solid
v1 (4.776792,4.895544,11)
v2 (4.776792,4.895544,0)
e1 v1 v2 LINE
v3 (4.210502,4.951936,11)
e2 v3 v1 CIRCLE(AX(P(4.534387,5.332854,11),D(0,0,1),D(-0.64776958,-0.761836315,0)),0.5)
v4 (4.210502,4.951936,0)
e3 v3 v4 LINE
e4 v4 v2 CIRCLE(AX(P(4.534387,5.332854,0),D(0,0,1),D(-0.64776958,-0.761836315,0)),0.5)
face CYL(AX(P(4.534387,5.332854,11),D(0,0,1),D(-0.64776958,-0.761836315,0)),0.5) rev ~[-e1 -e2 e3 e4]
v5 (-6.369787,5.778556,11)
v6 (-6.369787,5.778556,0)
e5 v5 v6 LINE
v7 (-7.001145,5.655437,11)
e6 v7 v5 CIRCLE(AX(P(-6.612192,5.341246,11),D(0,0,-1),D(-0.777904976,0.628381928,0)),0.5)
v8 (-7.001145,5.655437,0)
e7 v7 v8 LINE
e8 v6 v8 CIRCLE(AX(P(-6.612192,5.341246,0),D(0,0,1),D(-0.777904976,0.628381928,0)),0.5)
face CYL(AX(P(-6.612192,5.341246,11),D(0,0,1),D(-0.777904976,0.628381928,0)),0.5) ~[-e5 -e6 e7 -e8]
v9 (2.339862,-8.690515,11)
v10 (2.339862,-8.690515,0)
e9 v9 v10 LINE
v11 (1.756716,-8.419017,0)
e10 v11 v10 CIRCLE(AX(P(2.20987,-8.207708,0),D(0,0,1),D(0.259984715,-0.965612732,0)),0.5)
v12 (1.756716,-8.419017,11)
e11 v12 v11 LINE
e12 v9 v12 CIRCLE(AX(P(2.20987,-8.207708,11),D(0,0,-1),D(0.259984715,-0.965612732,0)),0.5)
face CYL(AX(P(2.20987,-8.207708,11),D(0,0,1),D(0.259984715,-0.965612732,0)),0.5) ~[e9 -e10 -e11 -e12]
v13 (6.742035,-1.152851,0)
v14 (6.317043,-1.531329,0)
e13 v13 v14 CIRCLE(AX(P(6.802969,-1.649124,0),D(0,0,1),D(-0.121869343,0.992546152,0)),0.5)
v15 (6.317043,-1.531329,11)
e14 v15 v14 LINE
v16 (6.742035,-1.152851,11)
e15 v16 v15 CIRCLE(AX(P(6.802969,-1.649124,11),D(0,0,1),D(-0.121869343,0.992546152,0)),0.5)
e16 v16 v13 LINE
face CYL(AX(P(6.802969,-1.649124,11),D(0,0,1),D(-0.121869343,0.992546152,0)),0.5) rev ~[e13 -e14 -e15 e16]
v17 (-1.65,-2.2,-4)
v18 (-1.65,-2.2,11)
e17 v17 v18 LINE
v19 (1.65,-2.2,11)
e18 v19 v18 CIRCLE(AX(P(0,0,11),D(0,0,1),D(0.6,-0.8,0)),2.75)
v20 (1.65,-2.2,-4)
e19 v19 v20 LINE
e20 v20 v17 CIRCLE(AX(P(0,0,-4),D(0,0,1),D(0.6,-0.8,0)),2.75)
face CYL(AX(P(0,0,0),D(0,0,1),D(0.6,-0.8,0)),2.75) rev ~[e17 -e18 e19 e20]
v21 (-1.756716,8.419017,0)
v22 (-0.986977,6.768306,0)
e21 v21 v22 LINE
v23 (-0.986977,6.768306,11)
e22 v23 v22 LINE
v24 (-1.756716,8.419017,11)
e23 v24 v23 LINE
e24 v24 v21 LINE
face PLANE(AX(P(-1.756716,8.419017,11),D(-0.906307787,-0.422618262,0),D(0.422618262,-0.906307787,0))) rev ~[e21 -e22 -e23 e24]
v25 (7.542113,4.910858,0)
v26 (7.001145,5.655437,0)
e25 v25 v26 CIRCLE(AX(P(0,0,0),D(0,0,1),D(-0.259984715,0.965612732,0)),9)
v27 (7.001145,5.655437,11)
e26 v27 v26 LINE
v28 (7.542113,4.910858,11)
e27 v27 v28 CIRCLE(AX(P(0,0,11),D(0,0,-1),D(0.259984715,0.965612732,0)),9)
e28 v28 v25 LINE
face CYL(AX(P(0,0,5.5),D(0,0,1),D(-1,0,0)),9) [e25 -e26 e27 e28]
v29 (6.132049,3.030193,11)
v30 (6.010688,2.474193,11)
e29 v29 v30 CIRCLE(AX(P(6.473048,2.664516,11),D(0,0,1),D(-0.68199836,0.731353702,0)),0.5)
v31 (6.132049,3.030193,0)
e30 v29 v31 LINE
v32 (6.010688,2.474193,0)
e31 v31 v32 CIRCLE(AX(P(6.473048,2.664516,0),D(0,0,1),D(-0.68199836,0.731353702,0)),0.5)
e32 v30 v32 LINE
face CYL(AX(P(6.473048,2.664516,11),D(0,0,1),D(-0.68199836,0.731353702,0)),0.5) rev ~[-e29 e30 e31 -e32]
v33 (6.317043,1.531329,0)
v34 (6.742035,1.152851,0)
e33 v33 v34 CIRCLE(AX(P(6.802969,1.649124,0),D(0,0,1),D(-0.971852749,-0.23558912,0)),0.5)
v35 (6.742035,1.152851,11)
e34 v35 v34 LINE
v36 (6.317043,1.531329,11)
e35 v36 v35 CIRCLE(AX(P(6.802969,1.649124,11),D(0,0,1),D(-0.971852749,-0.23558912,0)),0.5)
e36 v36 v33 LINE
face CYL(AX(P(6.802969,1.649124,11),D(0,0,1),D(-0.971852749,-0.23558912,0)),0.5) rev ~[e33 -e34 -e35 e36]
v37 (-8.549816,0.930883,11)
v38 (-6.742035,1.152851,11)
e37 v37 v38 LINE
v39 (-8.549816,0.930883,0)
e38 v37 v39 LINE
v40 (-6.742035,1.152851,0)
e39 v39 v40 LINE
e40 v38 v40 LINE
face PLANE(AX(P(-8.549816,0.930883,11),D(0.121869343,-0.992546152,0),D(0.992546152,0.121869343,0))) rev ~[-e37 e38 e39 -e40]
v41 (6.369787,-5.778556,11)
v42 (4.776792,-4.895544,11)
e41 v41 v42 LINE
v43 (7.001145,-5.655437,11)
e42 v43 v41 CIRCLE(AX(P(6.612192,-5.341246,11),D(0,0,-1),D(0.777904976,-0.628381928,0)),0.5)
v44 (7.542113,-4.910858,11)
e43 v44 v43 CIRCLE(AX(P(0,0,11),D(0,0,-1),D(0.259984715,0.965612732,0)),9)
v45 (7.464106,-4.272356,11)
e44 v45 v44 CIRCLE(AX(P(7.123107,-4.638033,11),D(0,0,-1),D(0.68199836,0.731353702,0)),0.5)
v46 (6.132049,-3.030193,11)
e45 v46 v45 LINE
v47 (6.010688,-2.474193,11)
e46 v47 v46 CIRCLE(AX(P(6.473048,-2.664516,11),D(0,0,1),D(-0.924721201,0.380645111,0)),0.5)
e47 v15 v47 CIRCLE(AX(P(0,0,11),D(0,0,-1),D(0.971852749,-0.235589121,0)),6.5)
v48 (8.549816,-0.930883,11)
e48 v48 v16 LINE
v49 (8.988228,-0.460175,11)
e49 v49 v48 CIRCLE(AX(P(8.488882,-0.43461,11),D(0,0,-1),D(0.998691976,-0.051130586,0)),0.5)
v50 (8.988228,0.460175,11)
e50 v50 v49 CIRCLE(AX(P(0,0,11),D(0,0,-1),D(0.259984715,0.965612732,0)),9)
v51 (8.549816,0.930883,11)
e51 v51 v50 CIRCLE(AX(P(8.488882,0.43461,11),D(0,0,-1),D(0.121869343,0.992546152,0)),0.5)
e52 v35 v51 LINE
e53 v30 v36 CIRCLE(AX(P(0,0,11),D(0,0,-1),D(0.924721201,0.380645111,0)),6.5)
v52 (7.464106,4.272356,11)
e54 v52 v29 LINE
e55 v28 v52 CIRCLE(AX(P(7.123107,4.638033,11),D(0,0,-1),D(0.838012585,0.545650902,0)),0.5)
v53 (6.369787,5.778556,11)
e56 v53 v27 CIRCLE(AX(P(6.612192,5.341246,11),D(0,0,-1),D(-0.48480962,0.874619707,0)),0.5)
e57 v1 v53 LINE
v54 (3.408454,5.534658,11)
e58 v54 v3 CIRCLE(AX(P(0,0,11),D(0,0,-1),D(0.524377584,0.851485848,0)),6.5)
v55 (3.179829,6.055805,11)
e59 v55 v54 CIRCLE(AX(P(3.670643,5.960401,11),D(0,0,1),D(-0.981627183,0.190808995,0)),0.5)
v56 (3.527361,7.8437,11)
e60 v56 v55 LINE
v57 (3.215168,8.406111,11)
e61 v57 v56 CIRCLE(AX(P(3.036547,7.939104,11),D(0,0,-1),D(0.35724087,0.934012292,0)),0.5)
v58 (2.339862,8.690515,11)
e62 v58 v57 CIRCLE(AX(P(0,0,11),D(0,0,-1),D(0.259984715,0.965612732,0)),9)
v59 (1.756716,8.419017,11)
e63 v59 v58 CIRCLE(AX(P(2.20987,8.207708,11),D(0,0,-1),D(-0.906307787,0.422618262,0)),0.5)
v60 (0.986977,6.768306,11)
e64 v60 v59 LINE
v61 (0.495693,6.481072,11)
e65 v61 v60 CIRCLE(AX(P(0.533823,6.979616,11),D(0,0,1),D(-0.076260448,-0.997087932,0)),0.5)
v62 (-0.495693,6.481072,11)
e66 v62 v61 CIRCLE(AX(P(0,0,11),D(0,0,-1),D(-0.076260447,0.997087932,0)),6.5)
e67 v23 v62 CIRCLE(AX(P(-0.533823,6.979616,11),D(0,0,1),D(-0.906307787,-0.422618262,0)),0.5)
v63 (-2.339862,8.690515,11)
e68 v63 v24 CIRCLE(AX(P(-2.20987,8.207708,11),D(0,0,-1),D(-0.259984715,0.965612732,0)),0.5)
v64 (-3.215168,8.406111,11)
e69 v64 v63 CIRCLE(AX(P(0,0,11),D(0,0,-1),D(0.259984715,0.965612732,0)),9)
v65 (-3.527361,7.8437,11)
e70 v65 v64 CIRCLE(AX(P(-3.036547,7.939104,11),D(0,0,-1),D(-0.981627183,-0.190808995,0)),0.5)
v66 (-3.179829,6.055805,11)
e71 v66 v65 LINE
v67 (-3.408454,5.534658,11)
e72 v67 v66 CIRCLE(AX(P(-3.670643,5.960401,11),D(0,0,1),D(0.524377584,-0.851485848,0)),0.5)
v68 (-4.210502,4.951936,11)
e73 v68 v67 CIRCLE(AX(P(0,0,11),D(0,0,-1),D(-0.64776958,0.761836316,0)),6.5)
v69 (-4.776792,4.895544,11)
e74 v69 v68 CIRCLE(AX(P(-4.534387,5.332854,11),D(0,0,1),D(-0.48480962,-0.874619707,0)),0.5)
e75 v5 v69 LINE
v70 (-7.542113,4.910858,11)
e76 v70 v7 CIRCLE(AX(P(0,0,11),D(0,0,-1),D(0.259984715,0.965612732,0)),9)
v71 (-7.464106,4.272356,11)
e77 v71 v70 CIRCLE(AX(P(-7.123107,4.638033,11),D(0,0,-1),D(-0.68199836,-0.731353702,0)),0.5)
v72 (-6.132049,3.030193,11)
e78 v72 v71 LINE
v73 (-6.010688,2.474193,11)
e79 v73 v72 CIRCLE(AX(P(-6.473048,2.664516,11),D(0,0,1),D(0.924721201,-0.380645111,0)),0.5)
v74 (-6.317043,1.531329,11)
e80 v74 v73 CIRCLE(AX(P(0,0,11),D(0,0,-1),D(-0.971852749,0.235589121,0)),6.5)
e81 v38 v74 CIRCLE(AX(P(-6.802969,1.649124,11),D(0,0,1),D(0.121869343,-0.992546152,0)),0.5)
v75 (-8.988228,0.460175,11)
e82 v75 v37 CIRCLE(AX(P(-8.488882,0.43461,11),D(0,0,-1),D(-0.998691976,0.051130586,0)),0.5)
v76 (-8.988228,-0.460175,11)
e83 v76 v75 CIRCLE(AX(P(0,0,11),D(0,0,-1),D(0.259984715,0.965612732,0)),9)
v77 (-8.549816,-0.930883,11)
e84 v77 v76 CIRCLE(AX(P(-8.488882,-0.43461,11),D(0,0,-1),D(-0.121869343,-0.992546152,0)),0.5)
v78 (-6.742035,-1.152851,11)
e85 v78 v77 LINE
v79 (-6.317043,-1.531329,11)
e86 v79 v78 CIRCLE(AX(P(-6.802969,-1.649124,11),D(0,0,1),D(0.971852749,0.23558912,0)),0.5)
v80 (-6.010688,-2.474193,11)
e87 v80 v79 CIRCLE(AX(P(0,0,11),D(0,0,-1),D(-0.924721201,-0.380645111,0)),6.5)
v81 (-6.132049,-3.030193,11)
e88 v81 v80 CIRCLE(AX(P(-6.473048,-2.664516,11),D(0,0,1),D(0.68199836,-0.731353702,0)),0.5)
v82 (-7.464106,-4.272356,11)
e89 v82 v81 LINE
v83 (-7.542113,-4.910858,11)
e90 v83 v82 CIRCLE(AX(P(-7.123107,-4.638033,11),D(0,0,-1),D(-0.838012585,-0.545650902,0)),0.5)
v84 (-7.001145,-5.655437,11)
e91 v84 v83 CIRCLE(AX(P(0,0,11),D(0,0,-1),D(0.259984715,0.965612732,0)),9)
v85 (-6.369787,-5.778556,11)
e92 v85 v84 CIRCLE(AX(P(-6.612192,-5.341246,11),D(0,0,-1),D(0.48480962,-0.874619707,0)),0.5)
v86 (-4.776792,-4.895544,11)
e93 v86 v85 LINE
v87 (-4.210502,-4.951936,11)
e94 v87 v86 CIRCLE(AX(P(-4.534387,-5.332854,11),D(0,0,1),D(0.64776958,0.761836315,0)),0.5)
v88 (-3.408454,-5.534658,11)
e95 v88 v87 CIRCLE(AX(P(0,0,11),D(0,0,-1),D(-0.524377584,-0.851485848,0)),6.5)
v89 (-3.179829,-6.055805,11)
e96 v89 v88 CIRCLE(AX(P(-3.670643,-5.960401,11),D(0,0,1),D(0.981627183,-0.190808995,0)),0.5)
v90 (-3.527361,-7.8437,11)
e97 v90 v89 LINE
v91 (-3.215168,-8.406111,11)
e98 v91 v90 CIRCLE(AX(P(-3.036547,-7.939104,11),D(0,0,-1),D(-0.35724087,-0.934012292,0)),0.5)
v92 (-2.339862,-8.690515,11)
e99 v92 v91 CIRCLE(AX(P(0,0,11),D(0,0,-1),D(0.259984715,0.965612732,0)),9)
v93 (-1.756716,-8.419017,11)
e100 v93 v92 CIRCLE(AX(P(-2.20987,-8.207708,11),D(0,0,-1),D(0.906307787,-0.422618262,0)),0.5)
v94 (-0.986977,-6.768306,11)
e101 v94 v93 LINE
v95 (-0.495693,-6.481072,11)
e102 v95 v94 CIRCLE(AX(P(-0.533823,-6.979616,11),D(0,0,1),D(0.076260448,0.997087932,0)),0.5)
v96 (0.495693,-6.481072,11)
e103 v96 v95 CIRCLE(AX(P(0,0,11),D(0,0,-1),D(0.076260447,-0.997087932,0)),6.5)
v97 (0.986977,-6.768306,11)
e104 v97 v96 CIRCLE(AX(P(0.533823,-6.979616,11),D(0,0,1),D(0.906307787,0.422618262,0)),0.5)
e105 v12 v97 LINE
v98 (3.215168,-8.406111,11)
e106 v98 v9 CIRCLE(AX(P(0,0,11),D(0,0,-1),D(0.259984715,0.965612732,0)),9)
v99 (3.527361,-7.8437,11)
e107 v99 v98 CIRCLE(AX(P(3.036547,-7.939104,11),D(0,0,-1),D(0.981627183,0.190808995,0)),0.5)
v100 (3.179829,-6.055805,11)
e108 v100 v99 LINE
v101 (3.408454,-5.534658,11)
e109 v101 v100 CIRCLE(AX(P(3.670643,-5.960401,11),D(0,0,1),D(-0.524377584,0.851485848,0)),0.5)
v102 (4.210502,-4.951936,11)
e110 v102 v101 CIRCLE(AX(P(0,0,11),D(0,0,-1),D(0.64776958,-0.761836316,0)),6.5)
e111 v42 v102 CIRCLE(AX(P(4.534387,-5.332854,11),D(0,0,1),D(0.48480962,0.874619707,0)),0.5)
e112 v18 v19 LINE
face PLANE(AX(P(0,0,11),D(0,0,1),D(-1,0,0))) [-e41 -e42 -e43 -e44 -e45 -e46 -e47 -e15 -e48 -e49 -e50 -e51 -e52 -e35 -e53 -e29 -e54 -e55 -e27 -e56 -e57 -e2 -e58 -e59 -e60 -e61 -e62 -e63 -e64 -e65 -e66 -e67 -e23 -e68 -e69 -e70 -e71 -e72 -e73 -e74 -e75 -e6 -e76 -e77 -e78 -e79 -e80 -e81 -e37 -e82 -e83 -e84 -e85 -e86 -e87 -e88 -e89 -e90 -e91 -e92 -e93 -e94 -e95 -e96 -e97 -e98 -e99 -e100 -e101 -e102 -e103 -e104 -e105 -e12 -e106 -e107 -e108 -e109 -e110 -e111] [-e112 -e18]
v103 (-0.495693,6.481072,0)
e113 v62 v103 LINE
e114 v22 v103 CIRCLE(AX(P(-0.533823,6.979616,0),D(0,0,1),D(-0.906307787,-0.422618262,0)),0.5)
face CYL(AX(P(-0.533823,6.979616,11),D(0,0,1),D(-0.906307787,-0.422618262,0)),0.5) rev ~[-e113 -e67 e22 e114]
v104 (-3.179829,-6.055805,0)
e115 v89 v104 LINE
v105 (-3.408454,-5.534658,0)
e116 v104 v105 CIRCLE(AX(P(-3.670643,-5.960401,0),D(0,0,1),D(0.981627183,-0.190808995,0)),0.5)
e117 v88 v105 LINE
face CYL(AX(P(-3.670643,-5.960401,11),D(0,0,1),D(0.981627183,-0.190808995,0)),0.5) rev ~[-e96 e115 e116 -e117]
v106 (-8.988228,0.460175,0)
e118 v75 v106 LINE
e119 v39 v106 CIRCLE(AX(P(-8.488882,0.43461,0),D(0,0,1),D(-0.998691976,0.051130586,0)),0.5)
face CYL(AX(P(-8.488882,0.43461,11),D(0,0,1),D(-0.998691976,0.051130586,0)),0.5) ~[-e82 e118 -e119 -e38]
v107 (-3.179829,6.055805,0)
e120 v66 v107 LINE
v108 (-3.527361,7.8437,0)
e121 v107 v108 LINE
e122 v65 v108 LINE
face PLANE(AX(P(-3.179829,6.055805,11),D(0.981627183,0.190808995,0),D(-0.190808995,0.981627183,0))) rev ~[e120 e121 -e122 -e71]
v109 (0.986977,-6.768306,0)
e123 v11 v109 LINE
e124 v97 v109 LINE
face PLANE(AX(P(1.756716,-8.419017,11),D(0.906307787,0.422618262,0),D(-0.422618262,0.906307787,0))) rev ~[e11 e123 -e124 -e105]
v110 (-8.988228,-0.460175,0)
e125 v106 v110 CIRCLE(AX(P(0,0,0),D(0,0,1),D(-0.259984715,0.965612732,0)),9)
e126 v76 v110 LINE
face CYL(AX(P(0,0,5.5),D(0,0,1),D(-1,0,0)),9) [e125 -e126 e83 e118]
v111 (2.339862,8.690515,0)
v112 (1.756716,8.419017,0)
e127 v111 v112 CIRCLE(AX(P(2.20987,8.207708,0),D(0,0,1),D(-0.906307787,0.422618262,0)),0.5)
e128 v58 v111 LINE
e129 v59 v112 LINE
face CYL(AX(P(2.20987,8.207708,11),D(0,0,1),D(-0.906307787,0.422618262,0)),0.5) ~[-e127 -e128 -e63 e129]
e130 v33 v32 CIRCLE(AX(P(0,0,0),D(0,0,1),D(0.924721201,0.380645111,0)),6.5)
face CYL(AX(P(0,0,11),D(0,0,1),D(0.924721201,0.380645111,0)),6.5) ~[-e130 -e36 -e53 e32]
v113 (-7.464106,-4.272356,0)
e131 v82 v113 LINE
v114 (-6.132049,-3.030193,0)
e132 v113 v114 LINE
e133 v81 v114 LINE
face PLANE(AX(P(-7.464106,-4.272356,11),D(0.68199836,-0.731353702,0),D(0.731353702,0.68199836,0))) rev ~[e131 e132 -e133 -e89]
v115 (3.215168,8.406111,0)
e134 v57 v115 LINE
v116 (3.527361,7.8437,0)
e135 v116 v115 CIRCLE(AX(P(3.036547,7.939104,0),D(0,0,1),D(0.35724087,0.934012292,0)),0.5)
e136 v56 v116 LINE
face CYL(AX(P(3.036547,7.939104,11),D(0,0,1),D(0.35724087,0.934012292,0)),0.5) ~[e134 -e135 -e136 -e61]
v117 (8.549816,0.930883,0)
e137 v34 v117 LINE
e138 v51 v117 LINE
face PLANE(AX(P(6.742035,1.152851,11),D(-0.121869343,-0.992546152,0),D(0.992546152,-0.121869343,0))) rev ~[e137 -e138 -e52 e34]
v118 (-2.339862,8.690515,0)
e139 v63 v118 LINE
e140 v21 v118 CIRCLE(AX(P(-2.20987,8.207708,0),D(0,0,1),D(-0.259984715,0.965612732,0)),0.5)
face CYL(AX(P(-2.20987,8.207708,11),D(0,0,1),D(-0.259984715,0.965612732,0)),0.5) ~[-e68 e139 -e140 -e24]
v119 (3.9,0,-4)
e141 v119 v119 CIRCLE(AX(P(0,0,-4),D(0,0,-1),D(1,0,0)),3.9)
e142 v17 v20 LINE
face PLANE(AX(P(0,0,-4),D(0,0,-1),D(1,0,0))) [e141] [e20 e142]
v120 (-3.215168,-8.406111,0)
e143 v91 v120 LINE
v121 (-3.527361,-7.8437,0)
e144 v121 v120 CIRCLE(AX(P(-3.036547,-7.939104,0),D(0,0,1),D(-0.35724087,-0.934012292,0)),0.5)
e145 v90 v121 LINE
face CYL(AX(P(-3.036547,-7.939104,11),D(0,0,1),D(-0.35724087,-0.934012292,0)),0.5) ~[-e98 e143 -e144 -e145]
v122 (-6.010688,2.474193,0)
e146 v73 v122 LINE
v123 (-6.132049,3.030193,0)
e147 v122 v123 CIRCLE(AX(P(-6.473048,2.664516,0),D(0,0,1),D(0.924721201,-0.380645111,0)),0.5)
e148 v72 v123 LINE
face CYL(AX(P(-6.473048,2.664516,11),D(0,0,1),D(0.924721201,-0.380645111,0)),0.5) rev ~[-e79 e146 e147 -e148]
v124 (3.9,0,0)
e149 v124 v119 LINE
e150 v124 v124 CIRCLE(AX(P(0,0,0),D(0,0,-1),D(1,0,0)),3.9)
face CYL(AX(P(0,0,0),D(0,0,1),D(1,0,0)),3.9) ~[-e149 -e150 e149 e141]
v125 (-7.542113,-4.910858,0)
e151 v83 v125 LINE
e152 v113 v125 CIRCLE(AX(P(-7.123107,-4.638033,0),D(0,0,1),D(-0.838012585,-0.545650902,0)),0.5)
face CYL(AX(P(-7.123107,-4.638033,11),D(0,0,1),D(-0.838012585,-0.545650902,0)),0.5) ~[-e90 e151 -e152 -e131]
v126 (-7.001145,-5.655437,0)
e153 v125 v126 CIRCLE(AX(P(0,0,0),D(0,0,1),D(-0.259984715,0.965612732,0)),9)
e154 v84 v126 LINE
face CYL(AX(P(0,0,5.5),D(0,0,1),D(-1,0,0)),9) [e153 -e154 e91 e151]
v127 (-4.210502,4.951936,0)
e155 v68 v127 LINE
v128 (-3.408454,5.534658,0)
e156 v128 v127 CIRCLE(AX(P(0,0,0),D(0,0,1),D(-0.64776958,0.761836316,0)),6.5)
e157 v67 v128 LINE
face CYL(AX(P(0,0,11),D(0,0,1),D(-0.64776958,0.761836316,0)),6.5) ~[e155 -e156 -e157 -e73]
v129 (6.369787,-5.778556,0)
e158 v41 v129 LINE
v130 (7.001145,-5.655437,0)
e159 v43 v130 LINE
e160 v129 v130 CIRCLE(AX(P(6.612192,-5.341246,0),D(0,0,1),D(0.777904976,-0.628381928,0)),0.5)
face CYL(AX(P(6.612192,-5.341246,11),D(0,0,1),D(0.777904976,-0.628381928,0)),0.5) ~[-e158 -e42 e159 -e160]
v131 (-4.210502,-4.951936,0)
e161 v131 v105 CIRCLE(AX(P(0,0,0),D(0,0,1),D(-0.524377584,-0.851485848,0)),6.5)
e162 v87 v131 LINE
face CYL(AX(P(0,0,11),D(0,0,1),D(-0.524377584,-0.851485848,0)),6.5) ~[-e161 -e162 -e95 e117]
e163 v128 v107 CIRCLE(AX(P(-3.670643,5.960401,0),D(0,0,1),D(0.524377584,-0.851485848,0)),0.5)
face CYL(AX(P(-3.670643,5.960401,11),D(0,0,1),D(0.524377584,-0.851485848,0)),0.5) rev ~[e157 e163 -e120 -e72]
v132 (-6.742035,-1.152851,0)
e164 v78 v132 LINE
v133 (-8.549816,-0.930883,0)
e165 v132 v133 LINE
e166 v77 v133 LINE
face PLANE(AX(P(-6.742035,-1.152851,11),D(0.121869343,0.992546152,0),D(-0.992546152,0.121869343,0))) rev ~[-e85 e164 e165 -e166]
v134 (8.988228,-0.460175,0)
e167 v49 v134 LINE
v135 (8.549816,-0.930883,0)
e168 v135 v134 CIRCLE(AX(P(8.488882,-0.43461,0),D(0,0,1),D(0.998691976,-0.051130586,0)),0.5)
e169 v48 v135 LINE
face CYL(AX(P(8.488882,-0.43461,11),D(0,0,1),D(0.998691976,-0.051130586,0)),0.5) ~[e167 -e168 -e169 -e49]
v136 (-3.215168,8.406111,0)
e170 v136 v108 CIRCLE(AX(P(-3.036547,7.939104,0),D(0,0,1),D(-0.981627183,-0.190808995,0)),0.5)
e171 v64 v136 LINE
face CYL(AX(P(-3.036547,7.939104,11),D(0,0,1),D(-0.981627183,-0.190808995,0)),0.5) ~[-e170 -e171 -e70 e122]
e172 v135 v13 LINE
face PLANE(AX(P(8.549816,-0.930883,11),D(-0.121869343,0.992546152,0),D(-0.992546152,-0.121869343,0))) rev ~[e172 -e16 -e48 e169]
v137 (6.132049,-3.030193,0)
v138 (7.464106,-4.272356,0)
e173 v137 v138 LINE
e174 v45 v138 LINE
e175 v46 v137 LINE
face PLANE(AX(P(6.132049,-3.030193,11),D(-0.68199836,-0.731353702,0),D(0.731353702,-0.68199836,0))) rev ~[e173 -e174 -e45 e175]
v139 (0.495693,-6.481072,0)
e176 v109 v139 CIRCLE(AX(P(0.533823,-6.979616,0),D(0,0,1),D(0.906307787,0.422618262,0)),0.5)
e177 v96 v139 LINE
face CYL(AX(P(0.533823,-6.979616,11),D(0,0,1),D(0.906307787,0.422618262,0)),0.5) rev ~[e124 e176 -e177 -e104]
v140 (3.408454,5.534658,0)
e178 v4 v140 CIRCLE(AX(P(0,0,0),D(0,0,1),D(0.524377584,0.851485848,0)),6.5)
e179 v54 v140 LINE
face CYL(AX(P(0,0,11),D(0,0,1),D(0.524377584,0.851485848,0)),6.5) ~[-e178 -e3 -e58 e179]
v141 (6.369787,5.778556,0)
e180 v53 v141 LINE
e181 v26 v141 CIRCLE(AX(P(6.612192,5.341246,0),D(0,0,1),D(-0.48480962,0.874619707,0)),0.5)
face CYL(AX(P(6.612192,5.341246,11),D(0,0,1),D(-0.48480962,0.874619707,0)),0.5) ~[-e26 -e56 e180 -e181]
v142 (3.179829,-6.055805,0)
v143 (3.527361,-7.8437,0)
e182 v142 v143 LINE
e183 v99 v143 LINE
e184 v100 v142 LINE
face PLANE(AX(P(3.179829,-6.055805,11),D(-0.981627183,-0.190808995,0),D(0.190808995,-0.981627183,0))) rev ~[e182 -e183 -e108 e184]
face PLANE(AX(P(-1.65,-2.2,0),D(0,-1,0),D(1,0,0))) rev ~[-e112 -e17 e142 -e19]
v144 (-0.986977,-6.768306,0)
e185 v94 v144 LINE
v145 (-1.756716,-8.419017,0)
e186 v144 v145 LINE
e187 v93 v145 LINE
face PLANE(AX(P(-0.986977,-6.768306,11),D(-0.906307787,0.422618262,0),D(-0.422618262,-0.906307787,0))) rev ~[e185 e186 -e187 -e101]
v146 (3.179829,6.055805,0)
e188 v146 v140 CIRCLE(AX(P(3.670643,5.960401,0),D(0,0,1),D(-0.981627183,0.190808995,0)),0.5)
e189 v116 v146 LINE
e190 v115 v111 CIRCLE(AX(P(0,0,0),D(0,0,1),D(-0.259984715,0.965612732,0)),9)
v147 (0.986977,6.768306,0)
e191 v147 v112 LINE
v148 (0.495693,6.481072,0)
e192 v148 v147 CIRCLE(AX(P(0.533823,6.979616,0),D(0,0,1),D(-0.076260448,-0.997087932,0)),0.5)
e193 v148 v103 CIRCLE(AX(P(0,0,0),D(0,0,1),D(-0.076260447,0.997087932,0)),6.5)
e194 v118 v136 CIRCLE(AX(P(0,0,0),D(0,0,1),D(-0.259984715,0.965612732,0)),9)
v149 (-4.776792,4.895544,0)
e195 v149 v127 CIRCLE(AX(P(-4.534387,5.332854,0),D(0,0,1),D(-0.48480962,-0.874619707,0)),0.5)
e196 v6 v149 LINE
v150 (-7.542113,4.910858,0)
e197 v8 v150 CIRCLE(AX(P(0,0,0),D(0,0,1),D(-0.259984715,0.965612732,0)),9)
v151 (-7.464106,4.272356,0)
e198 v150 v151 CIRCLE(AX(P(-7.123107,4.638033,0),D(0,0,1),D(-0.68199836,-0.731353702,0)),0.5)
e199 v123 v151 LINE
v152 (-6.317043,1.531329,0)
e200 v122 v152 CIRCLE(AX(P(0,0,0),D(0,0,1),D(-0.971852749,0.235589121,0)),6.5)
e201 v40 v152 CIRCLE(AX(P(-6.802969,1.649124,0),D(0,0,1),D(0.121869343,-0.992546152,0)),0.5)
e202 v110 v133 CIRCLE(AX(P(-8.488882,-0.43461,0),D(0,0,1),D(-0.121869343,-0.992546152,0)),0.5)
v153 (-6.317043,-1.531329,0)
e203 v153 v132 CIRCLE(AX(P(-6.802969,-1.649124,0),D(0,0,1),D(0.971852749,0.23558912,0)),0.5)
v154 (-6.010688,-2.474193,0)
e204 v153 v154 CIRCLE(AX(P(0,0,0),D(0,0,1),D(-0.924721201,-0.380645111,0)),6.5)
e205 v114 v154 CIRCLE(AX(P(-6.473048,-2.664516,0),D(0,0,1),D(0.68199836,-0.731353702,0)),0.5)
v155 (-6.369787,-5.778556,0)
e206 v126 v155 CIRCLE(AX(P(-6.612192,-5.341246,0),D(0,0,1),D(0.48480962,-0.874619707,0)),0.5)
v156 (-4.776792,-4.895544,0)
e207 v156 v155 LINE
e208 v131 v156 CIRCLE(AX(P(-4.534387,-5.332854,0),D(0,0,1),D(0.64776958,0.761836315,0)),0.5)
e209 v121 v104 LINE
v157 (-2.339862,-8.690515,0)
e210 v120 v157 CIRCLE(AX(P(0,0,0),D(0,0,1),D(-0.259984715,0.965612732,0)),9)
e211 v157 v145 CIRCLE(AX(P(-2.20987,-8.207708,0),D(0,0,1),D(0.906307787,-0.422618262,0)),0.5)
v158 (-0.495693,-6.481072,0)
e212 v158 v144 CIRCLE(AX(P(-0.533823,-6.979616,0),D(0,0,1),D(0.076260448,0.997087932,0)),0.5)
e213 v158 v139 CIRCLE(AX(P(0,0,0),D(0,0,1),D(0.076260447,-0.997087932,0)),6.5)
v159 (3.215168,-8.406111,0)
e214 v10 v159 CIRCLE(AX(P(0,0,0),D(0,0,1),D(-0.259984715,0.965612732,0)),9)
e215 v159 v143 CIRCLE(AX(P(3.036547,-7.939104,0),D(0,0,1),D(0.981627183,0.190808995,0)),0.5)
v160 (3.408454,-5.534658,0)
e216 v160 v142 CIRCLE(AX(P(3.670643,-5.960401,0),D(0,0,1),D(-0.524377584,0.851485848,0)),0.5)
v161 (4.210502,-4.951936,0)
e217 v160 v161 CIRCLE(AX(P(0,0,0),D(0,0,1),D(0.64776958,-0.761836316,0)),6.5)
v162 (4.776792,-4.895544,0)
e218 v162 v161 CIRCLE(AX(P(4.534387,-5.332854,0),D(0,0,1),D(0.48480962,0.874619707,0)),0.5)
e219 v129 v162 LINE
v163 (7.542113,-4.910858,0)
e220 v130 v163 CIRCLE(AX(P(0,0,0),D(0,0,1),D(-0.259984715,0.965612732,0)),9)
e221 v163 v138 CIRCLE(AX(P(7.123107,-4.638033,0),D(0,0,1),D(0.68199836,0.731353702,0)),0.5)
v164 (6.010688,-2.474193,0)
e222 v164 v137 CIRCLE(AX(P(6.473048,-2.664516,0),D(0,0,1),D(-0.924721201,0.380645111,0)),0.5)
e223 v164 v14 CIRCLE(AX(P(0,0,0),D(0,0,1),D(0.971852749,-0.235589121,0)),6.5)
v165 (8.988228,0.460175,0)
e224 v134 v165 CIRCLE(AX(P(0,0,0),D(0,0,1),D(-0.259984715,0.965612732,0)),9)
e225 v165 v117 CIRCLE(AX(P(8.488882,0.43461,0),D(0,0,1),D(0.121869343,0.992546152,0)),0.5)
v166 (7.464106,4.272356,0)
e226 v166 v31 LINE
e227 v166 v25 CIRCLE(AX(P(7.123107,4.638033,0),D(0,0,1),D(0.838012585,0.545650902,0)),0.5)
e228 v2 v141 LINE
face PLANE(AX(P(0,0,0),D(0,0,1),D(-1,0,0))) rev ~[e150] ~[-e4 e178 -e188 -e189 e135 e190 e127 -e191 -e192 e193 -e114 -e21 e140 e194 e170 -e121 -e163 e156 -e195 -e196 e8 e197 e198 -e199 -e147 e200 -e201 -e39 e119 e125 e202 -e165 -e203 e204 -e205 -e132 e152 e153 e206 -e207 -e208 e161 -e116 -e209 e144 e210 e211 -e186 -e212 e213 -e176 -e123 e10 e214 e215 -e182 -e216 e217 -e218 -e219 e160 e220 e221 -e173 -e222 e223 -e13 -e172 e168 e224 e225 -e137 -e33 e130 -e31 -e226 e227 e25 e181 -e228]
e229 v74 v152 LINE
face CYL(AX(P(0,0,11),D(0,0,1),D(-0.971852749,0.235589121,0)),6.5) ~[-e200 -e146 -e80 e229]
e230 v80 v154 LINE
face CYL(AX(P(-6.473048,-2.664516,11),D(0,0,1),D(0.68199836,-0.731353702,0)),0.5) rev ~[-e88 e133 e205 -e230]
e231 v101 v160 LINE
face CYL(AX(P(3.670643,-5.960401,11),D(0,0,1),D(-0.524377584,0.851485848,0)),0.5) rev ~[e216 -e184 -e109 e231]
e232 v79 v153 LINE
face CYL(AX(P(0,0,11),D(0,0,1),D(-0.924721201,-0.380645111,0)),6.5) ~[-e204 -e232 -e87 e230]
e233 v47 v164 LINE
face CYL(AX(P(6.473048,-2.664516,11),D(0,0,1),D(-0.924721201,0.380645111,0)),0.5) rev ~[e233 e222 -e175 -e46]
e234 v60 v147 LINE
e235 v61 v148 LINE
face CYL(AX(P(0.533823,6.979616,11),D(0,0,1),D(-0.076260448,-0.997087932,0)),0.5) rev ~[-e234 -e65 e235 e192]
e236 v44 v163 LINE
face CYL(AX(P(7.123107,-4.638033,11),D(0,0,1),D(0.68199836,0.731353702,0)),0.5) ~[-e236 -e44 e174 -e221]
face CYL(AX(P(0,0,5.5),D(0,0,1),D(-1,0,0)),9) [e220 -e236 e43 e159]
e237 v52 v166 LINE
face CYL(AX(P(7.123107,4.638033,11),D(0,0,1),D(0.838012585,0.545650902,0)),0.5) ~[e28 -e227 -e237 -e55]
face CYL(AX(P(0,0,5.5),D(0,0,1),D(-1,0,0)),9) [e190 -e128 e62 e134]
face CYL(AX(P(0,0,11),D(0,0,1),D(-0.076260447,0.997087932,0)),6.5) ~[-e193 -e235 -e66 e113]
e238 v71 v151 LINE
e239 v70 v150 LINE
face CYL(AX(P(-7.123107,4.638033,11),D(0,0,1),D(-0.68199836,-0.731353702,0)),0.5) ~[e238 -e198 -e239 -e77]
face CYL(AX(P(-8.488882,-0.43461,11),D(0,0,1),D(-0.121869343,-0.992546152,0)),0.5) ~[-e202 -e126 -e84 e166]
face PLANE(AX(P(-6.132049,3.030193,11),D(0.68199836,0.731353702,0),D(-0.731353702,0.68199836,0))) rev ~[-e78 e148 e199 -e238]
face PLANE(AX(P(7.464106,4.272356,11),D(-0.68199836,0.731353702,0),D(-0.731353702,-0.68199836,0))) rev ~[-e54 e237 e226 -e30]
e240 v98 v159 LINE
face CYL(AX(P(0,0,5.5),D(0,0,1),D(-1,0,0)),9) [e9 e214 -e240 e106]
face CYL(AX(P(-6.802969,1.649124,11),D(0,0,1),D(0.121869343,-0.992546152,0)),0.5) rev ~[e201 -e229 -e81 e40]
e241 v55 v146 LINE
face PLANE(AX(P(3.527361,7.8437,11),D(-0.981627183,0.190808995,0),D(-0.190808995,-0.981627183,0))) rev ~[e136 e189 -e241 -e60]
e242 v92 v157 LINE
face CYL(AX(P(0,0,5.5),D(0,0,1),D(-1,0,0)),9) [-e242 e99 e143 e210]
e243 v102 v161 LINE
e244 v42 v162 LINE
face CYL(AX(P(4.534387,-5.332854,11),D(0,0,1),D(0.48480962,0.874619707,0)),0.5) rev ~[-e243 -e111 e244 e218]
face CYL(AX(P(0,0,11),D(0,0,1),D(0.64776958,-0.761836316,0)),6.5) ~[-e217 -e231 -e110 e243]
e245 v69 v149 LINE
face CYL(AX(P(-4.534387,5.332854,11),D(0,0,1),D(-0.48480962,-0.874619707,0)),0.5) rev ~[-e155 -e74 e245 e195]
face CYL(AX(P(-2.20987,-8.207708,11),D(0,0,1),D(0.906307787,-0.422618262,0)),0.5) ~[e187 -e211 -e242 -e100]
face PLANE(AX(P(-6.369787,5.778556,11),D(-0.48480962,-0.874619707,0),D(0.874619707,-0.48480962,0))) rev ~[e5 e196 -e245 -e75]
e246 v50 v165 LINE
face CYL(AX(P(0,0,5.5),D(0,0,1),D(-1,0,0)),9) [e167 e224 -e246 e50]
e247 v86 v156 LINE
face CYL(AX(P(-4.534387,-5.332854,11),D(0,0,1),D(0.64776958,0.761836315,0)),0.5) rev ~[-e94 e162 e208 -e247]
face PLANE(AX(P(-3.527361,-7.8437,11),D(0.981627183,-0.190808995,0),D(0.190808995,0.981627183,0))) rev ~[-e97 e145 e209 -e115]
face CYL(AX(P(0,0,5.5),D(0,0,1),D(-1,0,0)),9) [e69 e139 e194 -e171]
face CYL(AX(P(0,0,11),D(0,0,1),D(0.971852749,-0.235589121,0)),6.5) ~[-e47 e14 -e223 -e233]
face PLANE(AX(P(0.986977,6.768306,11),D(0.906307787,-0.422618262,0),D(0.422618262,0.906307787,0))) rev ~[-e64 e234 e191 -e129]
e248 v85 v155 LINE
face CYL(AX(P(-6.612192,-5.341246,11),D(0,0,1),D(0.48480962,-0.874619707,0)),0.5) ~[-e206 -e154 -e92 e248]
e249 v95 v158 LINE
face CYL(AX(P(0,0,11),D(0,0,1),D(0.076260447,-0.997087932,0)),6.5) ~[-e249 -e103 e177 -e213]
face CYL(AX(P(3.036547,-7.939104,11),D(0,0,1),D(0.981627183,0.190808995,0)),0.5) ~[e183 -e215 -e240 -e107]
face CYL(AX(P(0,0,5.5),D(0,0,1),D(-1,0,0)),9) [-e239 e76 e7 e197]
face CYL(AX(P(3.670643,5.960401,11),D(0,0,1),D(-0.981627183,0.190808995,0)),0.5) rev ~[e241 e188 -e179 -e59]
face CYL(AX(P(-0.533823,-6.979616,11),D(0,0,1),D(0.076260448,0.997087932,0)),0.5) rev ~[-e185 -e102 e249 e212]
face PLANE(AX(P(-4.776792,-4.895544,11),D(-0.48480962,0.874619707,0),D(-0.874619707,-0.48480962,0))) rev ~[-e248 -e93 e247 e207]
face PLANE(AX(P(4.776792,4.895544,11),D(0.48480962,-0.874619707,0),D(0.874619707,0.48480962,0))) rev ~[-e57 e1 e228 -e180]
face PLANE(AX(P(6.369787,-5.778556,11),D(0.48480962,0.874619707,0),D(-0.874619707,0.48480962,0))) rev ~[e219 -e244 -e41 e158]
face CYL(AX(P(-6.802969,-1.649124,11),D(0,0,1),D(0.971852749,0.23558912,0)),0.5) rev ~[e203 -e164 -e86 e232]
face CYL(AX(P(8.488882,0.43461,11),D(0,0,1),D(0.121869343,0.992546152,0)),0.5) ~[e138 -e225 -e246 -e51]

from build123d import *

# Parameters (mm, degrees)
F0_W            = 9
F0_H            = 11
F3_DEPTH        = 12
F3_COPIES_COUNT = 10
F5_DEPTH        = 25
F6_R            = 3.9
F7_DEPTH        = 4


# Not quite as in the source:
# - a pattern or mirror of a feature is missing from the dataset's text; its kind, count and spacing are read off the source's solid


with BuildPart() as f1:
    # F0 (on Front) → F1 (revolve)
    with BuildSketch(Plane.XZ):
        with Locations((-4.5, 5.5)):
            Rectangle(F0_W, F0_H)
    revolve(axis=Axis((0, 0, 5.5), (0, 0, 1)))

    # F2 (on face) → F3 (cut)
    with BuildSketch(Plane.XY.offset(11)):
        with BuildLine():
            ThreePointArc((-0.495692908, 6.4810715581), (0, 6.5), (0.495692908, 6.4810715581))
            ThreePointArc((0.495692908, 6.4810715581), (0.7861862119, 6.5479757718), (0.9869770252, 6.7683063932))
            Line((0.9869770252, 6.7683063932), (1.7567161864, 8.4190173512))
            ThreePointArc((1.7567161864, 8.4190173512), (1.9988344627, 8.6609895549), (2.3398624375, 8.6905145862))
            ThreePointArc((2.3398624375, 8.6905145862), (0, 9), (-2.3398624375, 8.6905145862))
            ThreePointArc((-2.3398624375, 8.6905145862), (-1.9988344627, 8.6609895549), (-1.7567161864, 8.4190173512))
            Line((-1.7567161864, 8.4190173512), (-0.9869770252, 6.7683063932))
            ThreePointArc((-0.9869770252, 6.7683063932), (-0.7861862119, 6.5479757718), (-0.495692908, 6.4810715581))
        make_face()
    f3 = extrude(amount=-F3_DEPTH, mode=Mode.SUBTRACT)

    # F3_copies: F3 ×10 about axis
    f3_copies_axis = Axis((0, 0, 0), (0, 0, 1))
    for i in range(1, F3_COPIES_COUNT):
        add(f3.rotate(f3_copies_axis, i * 360 / F3_COPIES_COUNT), mode=Mode.SUBTRACT)

    # F4 (on face) → F5 (cut)
    with BuildSketch(Plane.XY.offset(11)):
        with BuildLine():
            Line((-1.65, -2.2), (1.65, -2.2))
            ThreePointArc((1.65, -2.2), (0, 2.75), (-1.65, -2.2))
        make_face()
    extrude(amount=-F5_DEPTH, mode=Mode.SUBTRACT)

    # F6 (on face) → F7 (join)
    with BuildSketch(Plane(origin=(0, 0, 0), x_dir=(1, 0, 0), z_dir=(0, 0, -1))):
        Circle(F6_R)
        with BuildLine():
            ThreePointArc((1.65, 2.2), (0, -2.75), (-1.65, 2.2))
            Line((-1.65, 2.2), (1.65, 2.2))
        make_face(mode=Mode.SUBTRACT)
    extrude(amount=F7_DEPTH)


solid = f1.part
